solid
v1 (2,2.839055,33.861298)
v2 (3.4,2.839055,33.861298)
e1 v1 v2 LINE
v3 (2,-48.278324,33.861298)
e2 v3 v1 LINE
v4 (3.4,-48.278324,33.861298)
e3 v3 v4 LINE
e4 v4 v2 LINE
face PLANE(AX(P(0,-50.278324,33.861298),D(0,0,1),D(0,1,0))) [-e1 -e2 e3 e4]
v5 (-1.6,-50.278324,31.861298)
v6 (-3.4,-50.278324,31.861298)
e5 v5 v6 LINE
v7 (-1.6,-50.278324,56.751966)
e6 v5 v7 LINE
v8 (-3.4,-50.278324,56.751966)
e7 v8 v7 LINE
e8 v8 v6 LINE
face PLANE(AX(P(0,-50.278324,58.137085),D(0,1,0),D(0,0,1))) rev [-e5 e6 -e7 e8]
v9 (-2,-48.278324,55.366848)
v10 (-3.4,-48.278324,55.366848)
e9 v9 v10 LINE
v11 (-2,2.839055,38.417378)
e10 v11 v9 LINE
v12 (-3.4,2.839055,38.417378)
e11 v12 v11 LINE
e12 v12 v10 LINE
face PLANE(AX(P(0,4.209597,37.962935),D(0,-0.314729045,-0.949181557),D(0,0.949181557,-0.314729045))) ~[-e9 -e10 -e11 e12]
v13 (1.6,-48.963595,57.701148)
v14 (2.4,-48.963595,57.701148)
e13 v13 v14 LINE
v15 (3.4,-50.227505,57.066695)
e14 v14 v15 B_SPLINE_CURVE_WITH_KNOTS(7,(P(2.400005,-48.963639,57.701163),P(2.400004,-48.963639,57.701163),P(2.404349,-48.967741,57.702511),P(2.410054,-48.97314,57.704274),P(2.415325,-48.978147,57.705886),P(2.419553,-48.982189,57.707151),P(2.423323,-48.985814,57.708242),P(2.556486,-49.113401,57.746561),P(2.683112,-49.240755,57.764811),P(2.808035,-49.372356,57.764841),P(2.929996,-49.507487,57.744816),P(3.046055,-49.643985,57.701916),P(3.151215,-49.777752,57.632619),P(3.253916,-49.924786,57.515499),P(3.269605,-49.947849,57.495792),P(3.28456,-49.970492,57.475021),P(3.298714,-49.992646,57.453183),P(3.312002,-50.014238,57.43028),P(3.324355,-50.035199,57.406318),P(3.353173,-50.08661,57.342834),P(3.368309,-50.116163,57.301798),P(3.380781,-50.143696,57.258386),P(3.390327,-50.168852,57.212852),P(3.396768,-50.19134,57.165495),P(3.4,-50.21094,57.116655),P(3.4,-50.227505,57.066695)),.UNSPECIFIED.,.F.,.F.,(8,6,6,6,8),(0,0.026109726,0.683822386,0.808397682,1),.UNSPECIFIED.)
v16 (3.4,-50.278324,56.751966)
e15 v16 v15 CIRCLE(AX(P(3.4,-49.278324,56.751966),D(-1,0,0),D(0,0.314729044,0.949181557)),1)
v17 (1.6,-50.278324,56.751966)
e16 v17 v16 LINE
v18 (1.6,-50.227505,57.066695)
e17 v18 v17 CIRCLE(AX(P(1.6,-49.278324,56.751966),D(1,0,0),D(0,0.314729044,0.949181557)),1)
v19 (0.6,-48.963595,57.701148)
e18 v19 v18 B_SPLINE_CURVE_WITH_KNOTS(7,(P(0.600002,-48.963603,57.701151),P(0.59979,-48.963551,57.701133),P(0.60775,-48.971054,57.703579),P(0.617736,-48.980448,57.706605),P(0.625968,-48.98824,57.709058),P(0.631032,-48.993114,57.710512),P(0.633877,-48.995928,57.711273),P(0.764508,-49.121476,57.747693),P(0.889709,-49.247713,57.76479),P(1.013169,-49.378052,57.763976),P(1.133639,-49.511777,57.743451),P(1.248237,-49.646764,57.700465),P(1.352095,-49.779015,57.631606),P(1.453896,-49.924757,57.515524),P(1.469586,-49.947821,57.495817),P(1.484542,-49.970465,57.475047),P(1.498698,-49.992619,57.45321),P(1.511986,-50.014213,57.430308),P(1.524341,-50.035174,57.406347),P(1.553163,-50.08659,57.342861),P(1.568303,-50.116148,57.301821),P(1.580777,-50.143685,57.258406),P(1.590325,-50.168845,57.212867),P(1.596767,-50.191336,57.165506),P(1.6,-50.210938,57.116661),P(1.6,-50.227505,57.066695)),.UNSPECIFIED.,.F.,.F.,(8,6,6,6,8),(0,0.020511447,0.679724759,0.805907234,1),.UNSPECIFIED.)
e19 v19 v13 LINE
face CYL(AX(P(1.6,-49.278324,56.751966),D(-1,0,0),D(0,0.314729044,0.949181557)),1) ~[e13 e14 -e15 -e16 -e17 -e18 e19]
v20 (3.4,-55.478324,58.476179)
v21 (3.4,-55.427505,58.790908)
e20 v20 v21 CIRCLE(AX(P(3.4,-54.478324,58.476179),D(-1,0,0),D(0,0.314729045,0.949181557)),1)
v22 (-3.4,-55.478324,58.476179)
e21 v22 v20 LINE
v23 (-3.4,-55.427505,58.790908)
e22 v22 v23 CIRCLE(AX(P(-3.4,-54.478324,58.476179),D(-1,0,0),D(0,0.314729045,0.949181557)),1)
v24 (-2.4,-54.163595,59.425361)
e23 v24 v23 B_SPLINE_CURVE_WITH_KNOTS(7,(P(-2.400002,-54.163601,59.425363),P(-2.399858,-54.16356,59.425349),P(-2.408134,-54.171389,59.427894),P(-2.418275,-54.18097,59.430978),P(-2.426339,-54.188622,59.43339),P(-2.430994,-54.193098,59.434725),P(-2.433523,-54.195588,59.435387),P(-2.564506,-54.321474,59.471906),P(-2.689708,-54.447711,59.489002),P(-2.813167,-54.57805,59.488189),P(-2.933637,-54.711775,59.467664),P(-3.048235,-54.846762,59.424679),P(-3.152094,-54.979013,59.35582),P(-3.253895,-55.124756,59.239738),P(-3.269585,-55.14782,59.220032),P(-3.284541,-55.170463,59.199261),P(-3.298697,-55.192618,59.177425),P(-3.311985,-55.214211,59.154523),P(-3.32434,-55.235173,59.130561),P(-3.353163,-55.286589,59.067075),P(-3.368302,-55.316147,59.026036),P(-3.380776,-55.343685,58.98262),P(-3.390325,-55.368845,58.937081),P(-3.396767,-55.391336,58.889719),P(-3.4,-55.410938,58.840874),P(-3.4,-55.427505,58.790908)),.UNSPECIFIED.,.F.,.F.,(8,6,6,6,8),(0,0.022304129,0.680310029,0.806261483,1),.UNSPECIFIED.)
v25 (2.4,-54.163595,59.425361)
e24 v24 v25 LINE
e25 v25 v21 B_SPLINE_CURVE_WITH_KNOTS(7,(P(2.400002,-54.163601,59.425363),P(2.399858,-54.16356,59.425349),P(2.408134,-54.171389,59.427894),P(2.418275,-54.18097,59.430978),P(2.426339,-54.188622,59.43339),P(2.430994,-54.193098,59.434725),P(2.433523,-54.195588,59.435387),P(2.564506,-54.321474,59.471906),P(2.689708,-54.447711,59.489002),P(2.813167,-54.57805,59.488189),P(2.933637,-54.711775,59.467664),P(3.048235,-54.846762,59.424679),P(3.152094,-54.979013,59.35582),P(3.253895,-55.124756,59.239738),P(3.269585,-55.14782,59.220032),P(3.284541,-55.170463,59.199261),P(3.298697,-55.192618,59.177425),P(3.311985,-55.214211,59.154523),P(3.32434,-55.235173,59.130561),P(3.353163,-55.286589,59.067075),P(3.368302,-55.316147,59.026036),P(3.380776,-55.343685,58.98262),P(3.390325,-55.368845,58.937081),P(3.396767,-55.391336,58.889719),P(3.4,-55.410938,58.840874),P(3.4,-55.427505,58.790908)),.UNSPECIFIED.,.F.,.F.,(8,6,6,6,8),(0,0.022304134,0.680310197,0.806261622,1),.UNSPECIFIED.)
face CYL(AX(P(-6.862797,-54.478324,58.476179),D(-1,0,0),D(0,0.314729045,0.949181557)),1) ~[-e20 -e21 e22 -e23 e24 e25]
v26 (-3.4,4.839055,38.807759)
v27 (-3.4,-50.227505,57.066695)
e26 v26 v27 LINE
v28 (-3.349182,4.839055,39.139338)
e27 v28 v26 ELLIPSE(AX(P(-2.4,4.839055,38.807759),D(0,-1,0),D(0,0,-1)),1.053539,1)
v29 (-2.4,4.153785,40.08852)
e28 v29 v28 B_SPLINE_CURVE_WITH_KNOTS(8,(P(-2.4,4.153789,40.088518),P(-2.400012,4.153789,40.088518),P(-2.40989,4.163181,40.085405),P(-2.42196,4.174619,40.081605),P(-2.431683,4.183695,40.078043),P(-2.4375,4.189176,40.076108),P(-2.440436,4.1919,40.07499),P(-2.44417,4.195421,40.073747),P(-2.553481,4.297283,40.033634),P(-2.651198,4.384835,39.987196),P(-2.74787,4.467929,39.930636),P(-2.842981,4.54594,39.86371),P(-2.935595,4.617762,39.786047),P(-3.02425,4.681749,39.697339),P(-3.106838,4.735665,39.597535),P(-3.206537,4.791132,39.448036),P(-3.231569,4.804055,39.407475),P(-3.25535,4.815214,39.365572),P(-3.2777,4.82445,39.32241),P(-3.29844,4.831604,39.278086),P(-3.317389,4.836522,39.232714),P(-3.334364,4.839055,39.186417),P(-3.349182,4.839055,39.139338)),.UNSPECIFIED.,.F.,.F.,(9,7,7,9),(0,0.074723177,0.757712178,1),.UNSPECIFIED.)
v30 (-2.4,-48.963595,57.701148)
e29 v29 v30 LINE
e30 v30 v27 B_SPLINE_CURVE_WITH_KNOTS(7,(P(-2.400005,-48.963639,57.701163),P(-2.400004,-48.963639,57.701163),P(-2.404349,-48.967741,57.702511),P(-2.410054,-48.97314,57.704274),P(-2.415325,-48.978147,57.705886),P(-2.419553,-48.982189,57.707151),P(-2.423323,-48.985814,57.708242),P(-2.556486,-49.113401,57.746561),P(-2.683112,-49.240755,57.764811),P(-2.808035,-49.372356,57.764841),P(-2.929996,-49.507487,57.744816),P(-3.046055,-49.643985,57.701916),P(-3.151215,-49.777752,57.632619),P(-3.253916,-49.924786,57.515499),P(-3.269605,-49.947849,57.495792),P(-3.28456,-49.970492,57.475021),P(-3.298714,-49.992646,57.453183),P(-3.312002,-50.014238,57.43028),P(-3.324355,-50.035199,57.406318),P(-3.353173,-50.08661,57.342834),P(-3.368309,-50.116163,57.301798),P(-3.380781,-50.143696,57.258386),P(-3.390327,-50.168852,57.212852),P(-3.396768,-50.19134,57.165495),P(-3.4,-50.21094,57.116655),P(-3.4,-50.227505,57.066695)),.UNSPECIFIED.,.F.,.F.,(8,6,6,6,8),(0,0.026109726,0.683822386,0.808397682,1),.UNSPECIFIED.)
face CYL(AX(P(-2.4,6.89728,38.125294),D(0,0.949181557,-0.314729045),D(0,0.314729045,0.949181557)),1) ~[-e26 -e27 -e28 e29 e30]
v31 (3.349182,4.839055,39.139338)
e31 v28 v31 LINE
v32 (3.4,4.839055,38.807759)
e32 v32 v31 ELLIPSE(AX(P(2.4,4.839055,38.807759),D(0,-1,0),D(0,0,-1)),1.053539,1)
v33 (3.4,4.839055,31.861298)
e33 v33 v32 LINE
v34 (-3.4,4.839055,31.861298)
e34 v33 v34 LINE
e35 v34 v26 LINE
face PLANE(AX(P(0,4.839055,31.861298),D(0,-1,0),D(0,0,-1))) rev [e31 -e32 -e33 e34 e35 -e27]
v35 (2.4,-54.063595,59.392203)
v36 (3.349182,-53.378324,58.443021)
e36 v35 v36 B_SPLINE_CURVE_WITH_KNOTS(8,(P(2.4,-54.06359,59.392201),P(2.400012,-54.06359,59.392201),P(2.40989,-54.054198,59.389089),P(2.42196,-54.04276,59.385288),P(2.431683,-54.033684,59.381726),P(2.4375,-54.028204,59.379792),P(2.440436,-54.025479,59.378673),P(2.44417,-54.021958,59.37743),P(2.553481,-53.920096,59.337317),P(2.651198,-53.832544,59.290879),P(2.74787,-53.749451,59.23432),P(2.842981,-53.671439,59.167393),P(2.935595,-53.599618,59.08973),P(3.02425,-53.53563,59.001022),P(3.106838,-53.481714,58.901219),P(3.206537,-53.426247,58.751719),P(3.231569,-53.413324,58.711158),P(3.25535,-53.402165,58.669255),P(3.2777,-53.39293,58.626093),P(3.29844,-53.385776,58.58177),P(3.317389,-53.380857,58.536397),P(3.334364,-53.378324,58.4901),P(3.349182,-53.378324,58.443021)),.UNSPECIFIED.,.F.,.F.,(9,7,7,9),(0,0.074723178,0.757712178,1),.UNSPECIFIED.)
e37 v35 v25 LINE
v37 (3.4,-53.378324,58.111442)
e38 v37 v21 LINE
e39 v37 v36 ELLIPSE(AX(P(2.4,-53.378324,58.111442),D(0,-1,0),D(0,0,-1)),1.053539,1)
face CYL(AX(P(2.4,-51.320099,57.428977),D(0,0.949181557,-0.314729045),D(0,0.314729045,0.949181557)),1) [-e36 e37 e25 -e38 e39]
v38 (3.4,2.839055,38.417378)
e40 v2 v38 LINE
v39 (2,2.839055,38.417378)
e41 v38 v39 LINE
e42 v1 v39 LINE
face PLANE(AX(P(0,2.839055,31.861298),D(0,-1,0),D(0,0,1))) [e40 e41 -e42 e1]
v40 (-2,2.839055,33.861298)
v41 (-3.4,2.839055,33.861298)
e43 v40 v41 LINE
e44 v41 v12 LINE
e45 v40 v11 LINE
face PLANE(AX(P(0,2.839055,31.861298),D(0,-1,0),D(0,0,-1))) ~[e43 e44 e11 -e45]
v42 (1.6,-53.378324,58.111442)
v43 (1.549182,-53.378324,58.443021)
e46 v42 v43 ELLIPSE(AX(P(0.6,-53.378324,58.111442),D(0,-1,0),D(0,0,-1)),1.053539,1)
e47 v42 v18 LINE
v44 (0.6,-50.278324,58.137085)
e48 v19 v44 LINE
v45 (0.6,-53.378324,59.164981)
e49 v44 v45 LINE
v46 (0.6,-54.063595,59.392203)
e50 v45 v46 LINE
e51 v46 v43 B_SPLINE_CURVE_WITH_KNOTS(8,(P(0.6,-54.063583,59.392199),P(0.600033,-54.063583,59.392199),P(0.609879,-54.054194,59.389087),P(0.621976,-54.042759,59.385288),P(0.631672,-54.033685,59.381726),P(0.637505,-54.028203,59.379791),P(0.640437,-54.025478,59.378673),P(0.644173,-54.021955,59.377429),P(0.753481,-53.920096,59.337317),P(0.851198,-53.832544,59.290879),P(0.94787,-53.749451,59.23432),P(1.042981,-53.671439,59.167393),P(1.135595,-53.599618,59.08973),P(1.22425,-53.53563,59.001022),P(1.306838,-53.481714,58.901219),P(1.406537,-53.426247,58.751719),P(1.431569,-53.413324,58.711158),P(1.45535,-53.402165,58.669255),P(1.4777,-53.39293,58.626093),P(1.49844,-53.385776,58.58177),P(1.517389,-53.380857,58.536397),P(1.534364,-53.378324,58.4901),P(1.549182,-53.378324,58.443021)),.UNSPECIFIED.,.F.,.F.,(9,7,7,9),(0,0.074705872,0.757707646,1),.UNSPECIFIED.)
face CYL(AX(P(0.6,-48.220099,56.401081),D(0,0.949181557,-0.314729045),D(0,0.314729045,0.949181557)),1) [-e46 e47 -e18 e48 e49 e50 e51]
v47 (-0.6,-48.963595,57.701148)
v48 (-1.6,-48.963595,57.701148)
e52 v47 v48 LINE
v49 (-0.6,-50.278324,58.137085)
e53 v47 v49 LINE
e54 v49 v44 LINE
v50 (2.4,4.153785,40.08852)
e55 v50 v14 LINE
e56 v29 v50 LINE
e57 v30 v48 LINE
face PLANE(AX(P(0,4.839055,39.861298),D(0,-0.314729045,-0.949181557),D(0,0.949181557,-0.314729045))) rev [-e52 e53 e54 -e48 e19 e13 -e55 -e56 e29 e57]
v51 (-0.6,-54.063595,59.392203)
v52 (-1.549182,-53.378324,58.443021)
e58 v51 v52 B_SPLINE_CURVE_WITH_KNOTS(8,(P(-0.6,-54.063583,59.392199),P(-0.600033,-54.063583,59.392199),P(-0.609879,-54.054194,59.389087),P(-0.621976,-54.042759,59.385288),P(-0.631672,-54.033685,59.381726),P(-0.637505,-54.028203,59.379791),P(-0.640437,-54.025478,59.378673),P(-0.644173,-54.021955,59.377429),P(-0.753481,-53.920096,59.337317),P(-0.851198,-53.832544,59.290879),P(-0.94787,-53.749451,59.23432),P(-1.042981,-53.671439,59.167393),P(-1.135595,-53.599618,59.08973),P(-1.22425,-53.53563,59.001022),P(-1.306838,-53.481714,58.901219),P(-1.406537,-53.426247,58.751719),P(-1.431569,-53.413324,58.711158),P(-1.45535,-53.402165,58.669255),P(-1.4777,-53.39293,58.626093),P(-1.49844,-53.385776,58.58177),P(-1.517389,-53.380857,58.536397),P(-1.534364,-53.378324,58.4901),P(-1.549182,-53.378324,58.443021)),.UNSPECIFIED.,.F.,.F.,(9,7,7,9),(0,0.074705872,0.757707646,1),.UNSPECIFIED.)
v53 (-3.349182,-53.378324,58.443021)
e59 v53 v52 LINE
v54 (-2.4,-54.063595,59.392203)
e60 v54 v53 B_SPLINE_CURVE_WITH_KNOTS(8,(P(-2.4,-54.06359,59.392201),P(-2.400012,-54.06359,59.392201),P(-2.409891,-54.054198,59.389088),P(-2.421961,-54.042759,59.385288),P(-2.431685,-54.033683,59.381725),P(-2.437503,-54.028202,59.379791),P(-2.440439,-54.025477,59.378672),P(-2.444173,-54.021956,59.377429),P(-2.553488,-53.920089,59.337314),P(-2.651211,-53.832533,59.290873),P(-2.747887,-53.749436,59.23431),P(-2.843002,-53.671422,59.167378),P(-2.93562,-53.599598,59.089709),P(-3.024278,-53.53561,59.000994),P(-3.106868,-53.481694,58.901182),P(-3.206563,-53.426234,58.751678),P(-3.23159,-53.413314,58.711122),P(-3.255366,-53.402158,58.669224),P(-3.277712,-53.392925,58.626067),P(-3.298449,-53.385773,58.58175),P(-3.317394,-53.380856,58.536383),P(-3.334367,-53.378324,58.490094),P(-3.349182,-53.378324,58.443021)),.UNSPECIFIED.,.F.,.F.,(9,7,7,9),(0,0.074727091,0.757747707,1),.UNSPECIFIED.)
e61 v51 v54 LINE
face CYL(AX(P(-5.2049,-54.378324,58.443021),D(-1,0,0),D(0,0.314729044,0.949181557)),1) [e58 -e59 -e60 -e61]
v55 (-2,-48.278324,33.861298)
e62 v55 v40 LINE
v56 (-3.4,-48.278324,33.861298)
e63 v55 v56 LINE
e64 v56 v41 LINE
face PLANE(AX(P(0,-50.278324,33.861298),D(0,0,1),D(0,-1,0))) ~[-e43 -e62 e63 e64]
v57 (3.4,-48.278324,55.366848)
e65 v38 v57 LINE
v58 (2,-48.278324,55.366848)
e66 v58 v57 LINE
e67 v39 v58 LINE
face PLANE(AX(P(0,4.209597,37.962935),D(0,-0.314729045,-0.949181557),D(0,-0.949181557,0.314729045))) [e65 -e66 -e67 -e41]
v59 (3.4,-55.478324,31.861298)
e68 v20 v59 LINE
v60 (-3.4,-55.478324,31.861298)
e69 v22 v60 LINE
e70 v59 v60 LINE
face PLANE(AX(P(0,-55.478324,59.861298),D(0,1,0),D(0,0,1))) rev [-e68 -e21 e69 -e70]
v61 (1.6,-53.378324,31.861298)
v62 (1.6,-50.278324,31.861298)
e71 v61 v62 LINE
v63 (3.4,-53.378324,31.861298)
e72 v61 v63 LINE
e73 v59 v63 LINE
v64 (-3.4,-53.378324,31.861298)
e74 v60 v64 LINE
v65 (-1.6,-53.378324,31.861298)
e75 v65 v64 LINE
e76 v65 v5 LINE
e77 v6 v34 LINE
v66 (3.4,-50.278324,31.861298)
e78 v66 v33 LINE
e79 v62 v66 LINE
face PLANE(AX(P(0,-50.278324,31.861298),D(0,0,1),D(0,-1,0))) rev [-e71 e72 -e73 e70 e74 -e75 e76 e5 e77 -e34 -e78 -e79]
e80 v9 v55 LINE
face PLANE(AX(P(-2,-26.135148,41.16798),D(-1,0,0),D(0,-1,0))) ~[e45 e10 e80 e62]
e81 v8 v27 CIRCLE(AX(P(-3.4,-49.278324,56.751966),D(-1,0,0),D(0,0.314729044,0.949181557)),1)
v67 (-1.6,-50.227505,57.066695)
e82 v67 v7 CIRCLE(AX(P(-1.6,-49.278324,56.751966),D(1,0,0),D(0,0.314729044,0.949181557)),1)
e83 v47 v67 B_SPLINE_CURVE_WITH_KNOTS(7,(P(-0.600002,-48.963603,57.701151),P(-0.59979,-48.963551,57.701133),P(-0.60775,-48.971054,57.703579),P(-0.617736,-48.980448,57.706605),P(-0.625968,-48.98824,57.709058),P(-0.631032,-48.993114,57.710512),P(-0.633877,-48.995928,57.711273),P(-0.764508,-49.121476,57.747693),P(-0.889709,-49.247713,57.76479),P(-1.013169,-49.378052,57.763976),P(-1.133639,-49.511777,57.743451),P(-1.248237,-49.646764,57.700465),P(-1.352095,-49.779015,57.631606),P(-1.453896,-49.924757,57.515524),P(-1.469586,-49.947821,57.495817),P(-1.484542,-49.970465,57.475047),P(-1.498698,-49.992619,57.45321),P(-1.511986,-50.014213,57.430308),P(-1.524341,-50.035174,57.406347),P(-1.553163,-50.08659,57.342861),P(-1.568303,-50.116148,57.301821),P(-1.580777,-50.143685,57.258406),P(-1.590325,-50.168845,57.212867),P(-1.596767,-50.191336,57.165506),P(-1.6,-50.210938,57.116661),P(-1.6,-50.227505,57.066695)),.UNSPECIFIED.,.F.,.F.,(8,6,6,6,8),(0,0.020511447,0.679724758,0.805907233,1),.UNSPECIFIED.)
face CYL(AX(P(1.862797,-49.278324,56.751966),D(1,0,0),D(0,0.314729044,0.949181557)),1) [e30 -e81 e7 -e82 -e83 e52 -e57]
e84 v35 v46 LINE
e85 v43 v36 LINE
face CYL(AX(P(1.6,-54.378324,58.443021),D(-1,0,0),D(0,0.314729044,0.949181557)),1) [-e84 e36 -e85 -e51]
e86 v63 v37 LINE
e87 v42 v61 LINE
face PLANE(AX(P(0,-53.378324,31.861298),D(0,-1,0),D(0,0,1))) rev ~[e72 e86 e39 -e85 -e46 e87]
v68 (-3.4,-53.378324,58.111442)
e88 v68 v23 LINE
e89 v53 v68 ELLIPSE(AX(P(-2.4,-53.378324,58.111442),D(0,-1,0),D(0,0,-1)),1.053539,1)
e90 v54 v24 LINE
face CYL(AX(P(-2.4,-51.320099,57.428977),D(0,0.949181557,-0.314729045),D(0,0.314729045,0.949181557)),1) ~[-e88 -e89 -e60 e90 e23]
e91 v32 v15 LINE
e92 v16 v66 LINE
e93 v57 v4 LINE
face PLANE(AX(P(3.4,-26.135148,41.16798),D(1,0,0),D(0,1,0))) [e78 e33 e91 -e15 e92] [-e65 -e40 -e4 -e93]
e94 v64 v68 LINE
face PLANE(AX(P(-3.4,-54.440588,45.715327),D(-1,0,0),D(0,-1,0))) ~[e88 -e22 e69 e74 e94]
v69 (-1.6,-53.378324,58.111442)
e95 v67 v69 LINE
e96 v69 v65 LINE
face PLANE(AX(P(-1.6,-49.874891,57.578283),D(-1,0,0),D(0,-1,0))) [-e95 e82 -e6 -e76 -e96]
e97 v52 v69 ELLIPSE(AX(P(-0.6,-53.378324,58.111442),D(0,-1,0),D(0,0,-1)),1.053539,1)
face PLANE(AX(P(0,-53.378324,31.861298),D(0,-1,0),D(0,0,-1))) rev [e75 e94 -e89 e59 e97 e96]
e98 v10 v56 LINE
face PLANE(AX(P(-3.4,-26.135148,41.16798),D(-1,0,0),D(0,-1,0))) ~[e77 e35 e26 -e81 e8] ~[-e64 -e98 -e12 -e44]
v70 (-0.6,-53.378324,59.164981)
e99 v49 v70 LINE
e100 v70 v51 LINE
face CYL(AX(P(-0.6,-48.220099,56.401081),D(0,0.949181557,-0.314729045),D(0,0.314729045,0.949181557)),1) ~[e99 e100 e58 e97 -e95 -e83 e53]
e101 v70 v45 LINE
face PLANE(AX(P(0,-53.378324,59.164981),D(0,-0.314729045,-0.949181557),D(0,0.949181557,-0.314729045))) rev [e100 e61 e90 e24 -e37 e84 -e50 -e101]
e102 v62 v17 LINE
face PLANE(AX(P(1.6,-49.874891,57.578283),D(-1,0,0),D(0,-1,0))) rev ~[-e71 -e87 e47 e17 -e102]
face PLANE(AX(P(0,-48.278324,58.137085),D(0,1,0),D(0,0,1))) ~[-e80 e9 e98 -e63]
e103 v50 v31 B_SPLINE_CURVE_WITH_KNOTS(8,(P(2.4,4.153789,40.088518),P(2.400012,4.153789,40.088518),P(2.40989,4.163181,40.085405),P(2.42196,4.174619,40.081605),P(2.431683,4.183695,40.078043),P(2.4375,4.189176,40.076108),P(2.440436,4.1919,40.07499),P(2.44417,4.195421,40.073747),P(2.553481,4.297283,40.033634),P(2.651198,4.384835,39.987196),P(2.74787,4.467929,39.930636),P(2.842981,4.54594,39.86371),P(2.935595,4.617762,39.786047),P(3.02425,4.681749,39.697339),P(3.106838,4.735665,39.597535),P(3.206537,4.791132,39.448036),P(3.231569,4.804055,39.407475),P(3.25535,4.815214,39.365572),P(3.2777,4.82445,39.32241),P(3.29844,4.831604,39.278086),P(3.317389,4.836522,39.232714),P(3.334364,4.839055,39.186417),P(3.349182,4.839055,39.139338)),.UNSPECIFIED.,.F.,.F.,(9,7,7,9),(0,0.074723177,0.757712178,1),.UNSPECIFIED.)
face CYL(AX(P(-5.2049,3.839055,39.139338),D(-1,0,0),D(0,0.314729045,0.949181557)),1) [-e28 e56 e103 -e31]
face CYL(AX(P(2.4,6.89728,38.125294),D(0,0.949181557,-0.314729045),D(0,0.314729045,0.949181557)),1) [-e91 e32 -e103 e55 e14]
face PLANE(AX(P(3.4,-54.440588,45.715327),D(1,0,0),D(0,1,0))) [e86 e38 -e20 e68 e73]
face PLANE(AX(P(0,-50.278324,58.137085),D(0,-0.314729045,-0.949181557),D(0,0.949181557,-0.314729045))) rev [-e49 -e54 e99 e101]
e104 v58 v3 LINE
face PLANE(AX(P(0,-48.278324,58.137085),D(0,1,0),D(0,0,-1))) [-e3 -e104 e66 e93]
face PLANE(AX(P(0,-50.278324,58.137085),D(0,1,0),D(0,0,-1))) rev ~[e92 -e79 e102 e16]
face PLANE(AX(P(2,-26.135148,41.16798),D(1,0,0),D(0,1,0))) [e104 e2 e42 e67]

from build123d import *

# Parameters (mm, degrees)
F1_DEPTH     = 1.6
F2_DEPTH     = 3.4
F3_T         = -2
F5_T1_DEPTH  = 10.409799149
F5_T3_DEPTH  = 63.0683209094
F5_T5_DEPTH  = 5.2627965391
F5_T7_DEPTH  = 3.6048995745
F5_T9_DEPTH  = 7.2124323677
F5_T11_DEPTH = 13.7255930783
F5_T13_DEPTH = 3.6048995745
F5_T15_DEPTH = 5.2627965391
F5_T20_DEPTH = 8.7255930783
F5_T25_DEPTH = 8.2659715904
F5_T31_DEPTH = 8.2659715904
F5_T37_DEPTH = 8.7255930783
F5_T43_DEPTH = 8.7255930783
F5_T48_DEPTH = 8.2659715904
F5_T55_DEPTH = 8.2659715904
F5_T59_DEPTH = 5.409799149
F5_T66_DEPTH = 5.409799149
F5_T70_DEPTH = 8.2659715904
F5_T77_DEPTH = 8.2659715904
F5_T81_DEPTH = 8.7255930783


# Not quite as in the source:
# - a fillet or chamfer that OpenCascade refuses, or shapes differently, is made with other operations: its cross-section is extruded or revolved along the edge and cut away or added


with BuildPart() as f1:
    # F0 (on Right) → F1 (new body)
    with BuildSketch(Plane.YZ):
        Polygon((-50.2783237807, 58.1370850594), (-53.3783237807, 59.1649811775), (-53.3783237807, 31.8612979027), (-50.2783237807, 31.8612979027), align=None)
    extrude(amount=F1_DEPTH)

    # F0 (on Right) → F2 (join)
    with BuildSketch(Plane.YZ):
        Polygon((4.8390554843, 39.8612979027), (-50.2783237807, 58.1370850594), (-50.2783237807, 31.8612979027), (4.8390554843, 31.8612979027), align=None)
        Polygon((-53.3783237807, 59.1649811775), (-55.4783237807, 59.8612979027), (-55.4783237807, 31.8612979027), (-53.3783237807, 31.8612979027), align=None)
    extrude(amount=F2_DEPTH)

    # F3
    f3_openings = [f1.faces().sort_by_distance(p)[0] for p in [
        (3.4, -27.617715, 41.242296),
    ]]
    offset(amount=F3_T, openings=f3_openings)

    # F4: F1 across face


with BuildPart() as f1_1:
    add(f1.part)
    add(f1.part.mirror(Plane.YZ))

    # F5: fillet of radius 1 on 12 edges, made by hand

    # F5_s2 → F5_t1 (cut)
    with BuildSketch(Plane.YZ.offset(-5.2048995745)):
        with BuildLine():
            ThreePointArc((4.1537845288, 40.0885196301), (4.6498356778, 39.7246888034), (4.8390554843, 39.1393380729))
            Line((4.8390554843, 39.1393380729), (4.8390554843, 39.8612979027))
            Line((4.8390554843, 39.8612979027), (4.1537845288, 40.0885196301))
        make_face()
    extrude(amount=F5_T1_DEPTH, mode=Mode.SUBTRACT)

    # F5_s4 → F5_t3 (cut)
    with BuildSketch(Plane(origin=(0, -5.1752852335, 1.716017936), x_dir=(1, 0, 0), z_dir=(0, -0.9491815572, 0.3147290445))):
        with BuildLine():
            ThreePointArc((2.4, 39.3586001244), (3.1071067812, 39.0657069056), (3.4, 38.3586001244))
            Line((3.4, 38.3586001244), (3.4, 39.3586001244))
            Line((3.4, 39.3586001244), (2.4, 39.3586001244))
        make_face()
        with BuildLine():
            ThreePointArc((-2.4, 39.3586001244), (-3.1071067812, 39.0657069056), (-3.4, 38.3586001244))
            Line((-3.4, 38.3586001244), (-3.4, 39.3586001244))
            Line((-3.4, 39.3586001244), (-2.4, 39.3586001244))
        make_face()
    extrude(amount=F5_T3_DEPTH, mode=Mode.SUBTRACT)

    # F5_s6 → F5_t5 (cut)
    with BuildSketch(Plane.YZ.offset(1.6)):
        with BuildLine():
            ThreePointArc((-48.9635947362, 57.701148001), (-49.8636745112, 57.5627466373), (-50.2783237807, 56.7519664438))
            Line((-50.2783237807, 56.7519664438), (-50.2783237807, 58.1370850594))
            Line((-50.2783237807, 58.1370850594), (-48.9635947362, 57.701148001))
        make_face()
    extrude(amount=F5_T5_DEPTH, mode=Mode.SUBTRACT)

    # F5_s8 → F5_t7 (cut)
    with BuildSketch(Plane.YZ.offset(1.6)):
        with BuildLine():
            ThreePointArc((-54.0635947362, 59.3922029049), (-53.5675435871, 59.0283720783), (-53.3783237807, 58.4430213477))
            Line((-53.3783237807, 58.4430213477), (-53.3783237807, 59.1649811775))
            Line((-53.3783237807, 59.1649811775), (-54.0635947362, 59.3922029049))
        make_face()
    extrude(amount=F5_T7_DEPTH, mode=Mode.SUBTRACT)

    # F5_s10 → F5_t9 (cut)
    with BuildSketch(Plane(origin=(0, -63.3926644985, 21.0197012108), x_dir=(1, 0, 0), z_dir=(0, -0.9491815572, 0.3147290445))):
        with BuildLine():
            ThreePointArc((2.4, 39.3586001244), (3.1071067812, 39.0657069056), (3.4, 38.3586001244))
            Line((3.4, 38.3586001244), (3.4, 39.3586001244))
            Line((3.4, 39.3586001244), (2.4, 39.3586001244))
        make_face()
        with BuildLine():
            ThreePointArc((-2.4, 39.3586001244), (-3.1071067812, 39.0657069056), (-3.4, 38.3586001244))
            Line((-3.4, 38.3586001244), (-3.4, 39.3586001244))
            Line((-3.4, 39.3586001244), (-2.4, 39.3586001244))
        make_face()
    extrude(amount=F5_T9_DEPTH, mode=Mode.SUBTRACT)

    # F5_s12 → F5_t11 (cut)
    with BuildSketch(Plane.YZ.offset(-6.8627965391)):
        with BuildLine():
            ThreePointArc((-54.1635947362, 59.4253608442), (-55.0636745112, 59.2869594806), (-55.4783237807, 58.476179287))
            Line((-55.4783237807, 58.476179287), (-55.4783237807, 59.8612979027))
            Line((-55.4783237807, 59.8612979027), (-54.1635947362, 59.4253608442))
        make_face()
    extrude(amount=F5_T11_DEPTH, mode=Mode.SUBTRACT)

    # F5_s14 → F5_t13 (cut)
    with BuildSketch(Plane.YZ.offset(-5.2048995745)):
        with BuildLine():
            ThreePointArc((-54.0635947362, 59.3922029049), (-53.5675435871, 59.0283720783), (-53.3783237807, 58.4430213477))
            Line((-53.3783237807, 58.4430213477), (-53.3783237807, 59.1649811775))
            Line((-53.3783237807, 59.1649811775), (-54.0635947362, 59.3922029049))
        make_face()
    extrude(amount=F5_T13_DEPTH, mode=Mode.SUBTRACT)

    # F5_s16 → F5_t15 (cut)
    with BuildSketch(Plane.YZ.offset(-6.8627965391)):
        with BuildLine():
            ThreePointArc((-48.9635947362, 57.701148001), (-49.8636745112, 57.5627466373), (-50.2783237807, 56.7519664438))
            Line((-50.2783237807, 56.7519664438), (-50.2783237807, 58.1370850594))
            Line((-50.2783237807, 58.1370850594), (-48.9635947362, 57.701148001))
        make_face()
    extrude(amount=F5_T15_DEPTH, mode=Mode.SUBTRACT)


with BuildPart() as f5_tool18:
    # F5_s19 → F5_t20 (new body)
    with BuildSketch(Plane.YZ.offset(-1.8627965391)):
        with BuildLine():
            ThreePointArc((-48.9635947362, 57.701148001), (-49.8636745112, 57.5627466373), (-50.2783237807, 56.7519664438))
            Line((-50.2783237807, 56.7519664438), (-50.2783237807, 58.1370850594))
            Line((-50.2783237807, 58.1370850594), (-48.9635947362, 57.701148001))
        make_face()
    extrude(amount=F5_T20_DEPTH)

    split(bisect_by=Plane.YZ.offset(-1.6), keep=Keep.BOTTOM)


with BuildPart() as f1_2:
    add(f1_1.part)

    # F5_t17: cut F5_tool18
    add(f5_tool18.part, mode=Mode.SUBTRACT)


with BuildPart() as f5_tool23:
    # F5_s24 → F5_t25 (new body)
    with BuildSketch(Plane(origin=(0, -60.2926644985, 19.9918050927), x_dir=(1, 0, 0), z_dir=(0, -0.9491815572, 0.3147290445))):
        with BuildLine():
            ThreePointArc((0.6, 39.3586001244), (1.3071067812, 39.0657069056), (1.6, 38.3586001244))
            Line((1.6, 38.3586001244), (1.6, 39.3586001244))
            Line((1.6, 39.3586001244), (0.6, 39.3586001244))
        make_face()
    extrude(amount=F5_T25_DEPTH)

    split(bisect_by=Plane.XZ.offset(53.3783237807), keep=Keep.BOTTOM)

    split(bisect_by=Plane.XZ.offset(50.2783237807), keep=Keep.TOP)


with BuildPart() as f1_3:
    add(f1_2.part)

    # F5_t22: cut F5_tool23
    add(f5_tool23.part, mode=Mode.SUBTRACT)


with BuildPart() as f5_tool29:
    # F5_s30 → F5_t31 (new body)
    with BuildSketch(Plane(origin=(0, -60.2926644985, 19.9918050927), x_dir=(1, 0, 0), z_dir=(0, -0.9491815572, 0.3147290445))):
        with BuildLine():
            ThreePointArc((-0.6, 39.3586001244), (-1.3071067812, 39.0657069056), (-1.6, 38.3586001244))
            Line((-1.6, 38.3586001244), (-1.6, 39.3586001244))
            Line((-1.6, 39.3586001244), (-0.6, 39.3586001244))
        make_face()
    extrude(amount=F5_T31_DEPTH)

    split(bisect_by=Plane.XZ.offset(50.2783237807), keep=Keep.TOP)

    split(bisect_by=Plane.XZ.offset(53.3783237807), keep=Keep.BOTTOM)


with BuildPart() as f1_4:
    add(f1_3.part)

    # F5_t28: cut F5_tool29
    add(f5_tool29.part, mode=Mode.SUBTRACT)


with BuildPart() as f5_tool35:
    # F5_s36 → F5_t37 (new body)
    with BuildSketch(Plane.YZ.offset(1.8627965391)):
        with BuildLine():
            ThreePointArc((-48.9635947362, 57.701148001), (-49.8636745112, 57.5627466373), (-50.2783237807, 56.7519664438))
            Line((-50.2783237807, 56.7519664438), (-50.2783237807, 58.1370850594))
            Line((-50.2783237807, 58.1370850594), (-48.9635947362, 57.701148001))
        make_face()
    extrude(amount=-F5_T37_DEPTH)

    split(bisect_by=Plane.YZ.offset(1.6), keep=Keep.TOP)


with BuildPart() as f1_5:
    add(f1_4.part)

    # F5_t34: cut F5_tool35
    add(f5_tool35.part, mode=Mode.SUBTRACT)


with BuildPart() as f5_tool41:
    # F5_s42 → F5_t43 (new body)
    with BuildSketch(Plane.YZ.offset(-1.8627965391)):
        with BuildLine():
            ThreePointArc((-48.9635947362, 57.701148001), (-49.8636745112, 57.5627466373), (-50.2783237807, 56.7519664438))
            Line((-50.2783237807, 56.7519664438), (-50.2783237807, 58.1370850594))
            Line((-50.2783237807, 58.1370850594), (-48.9635947362, 57.701148001))
        make_face()
    extrude(amount=F5_T43_DEPTH)

    split(bisect_by=Plane.YZ.offset(-1.6), keep=Keep.TOP)

    split(bisect_by=Plane.YZ.offset(1.6), keep=Keep.BOTTOM)


with BuildPart() as f5_tool46:
    # F5_s47 → F5_t48 (new body)
    with BuildSketch(Plane(origin=(0, -60.2926644985, 19.9918050927), x_dir=(1, 0, 0), z_dir=(0, -0.9491815572, 0.3147290445))):
        with BuildLine():
            ThreePointArc((0.6, 39.3586001244), (1.3071067812, 39.0657069056), (1.6, 38.3586001244))
            Line((1.6, 38.3586001244), (1.6, 39.3586001244))
            Line((1.6, 39.3586001244), (0.6, 39.3586001244))
        make_face()
    extrude(amount=F5_T48_DEPTH)

    split(bisect_by=Plane.XZ.offset(50.2783237807), keep=Keep.BOTTOM)


with BuildPart() as f5_tool41_1:
    add(f5_tool41.part)

    # F5_t50: intersect F5_tool46
    add(f5_tool46.part, mode=Mode.INTERSECT)


with BuildPart() as f1_6:
    add(f1_5.part)

    # F5_t39: cut F5_tool41
    add(f5_tool41_1.part, mode=Mode.SUBTRACT)


with BuildPart() as f5_tool53:
    # F5_s54 → F5_t55 (new body)
    with BuildSketch(Plane(origin=(0, -60.2926644985, 19.9918050927), x_dir=(1, 0, 0), z_dir=(0, -0.9491815572, 0.3147290445))):
        with BuildLine():
            ThreePointArc((0.6, 39.3586001244), (1.3071067812, 39.0657069056), (1.6, 38.3586001244))
            Line((1.6, 38.3586001244), (1.6, 39.3586001244))
            Line((1.6, 39.3586001244), (0.6, 39.3586001244))
        make_face()
    extrude(amount=F5_T55_DEPTH)

    split(bisect_by=Plane.XZ.offset(53.3783237807), keep=Keep.TOP)


with BuildPart() as f5_tool57:
    # F5_s58 → F5_t59 (new body)
    with BuildSketch(Plane.YZ.offset(-0.2048995745)):
        with BuildLine():
            ThreePointArc((-54.0635947362, 59.3922029049), (-53.5675435871, 59.0283720783), (-53.3783237807, 58.4430213477))
            Line((-53.3783237807, 58.4430213477), (-53.3783237807, 59.1649811775))
            Line((-53.3783237807, 59.1649811775), (-54.0635947362, 59.3922029049))
        make_face()
    extrude(amount=F5_T59_DEPTH)

    split(bisect_by=Plane.YZ.offset(1.6), keep=Keep.BOTTOM)


with BuildPart() as f5_tool53_1:
    add(f5_tool53.part)

    # F5_t61: intersect F5_tool57
    add(f5_tool57.part, mode=Mode.INTERSECT)


with BuildPart() as f1_7:
    add(f1_6.part)

    # F5_t51: cut F5_tool53
    add(f5_tool53_1.part, mode=Mode.SUBTRACT)


with BuildPart() as f5_tool64:
    # F5_s65 → F5_t66 (new body)
    with BuildSketch(Plane.YZ.offset(0.2048995745)):
        with BuildLine():
            ThreePointArc((-54.0635947362, 59.3922029049), (-53.5675435871, 59.0283720783), (-53.3783237807, 58.4430213477))
            Line((-53.3783237807, 58.4430213477), (-53.3783237807, 59.1649811775))
            Line((-53.3783237807, 59.1649811775), (-54.0635947362, 59.3922029049))
        make_face()
    extrude(amount=-F5_T66_DEPTH)

    split(bisect_by=Plane.YZ.offset(-1.6), keep=Keep.TOP)


with BuildPart() as f5_tool68:
    # F5_s69 → F5_t70 (new body)
    with BuildSketch(Plane(origin=(0, -60.2926644985, 19.9918050927), x_dir=(1, 0, 0), z_dir=(0, -0.9491815572, 0.3147290445))):
        with BuildLine():
            ThreePointArc((-0.6, 39.3586001244), (-1.3071067812, 39.0657069056), (-1.6, 38.3586001244))
            Line((-1.6, 38.3586001244), (-1.6, 39.3586001244))
            Line((-1.6, 39.3586001244), (-0.6, 39.3586001244))
        make_face()
    extrude(amount=F5_T70_DEPTH)

    split(bisect_by=Plane.XZ.offset(53.3783237807), keep=Keep.TOP)


with BuildPart() as f5_tool64_1:
    add(f5_tool64.part)

    # F5_t72: intersect F5_tool68
    add(f5_tool68.part, mode=Mode.INTERSECT)


with BuildPart() as f1_8:
    add(f1_7.part)

    # F5_t62: cut F5_tool64
    add(f5_tool64_1.part, mode=Mode.SUBTRACT)


with BuildPart() as f5_tool75:
    # F5_s76 → F5_t77 (new body)
    with BuildSketch(Plane(origin=(0, -60.2926644985, 19.9918050927), x_dir=(1, 0, 0), z_dir=(0, -0.9491815572, 0.3147290445))):
        with BuildLine():
            ThreePointArc((-0.6, 39.3586001244), (-1.3071067812, 39.0657069056), (-1.6, 38.3586001244))
            Line((-1.6, 38.3586001244), (-1.6, 39.3586001244))
            Line((-1.6, 39.3586001244), (-0.6, 39.3586001244))
        make_face()
    extrude(amount=F5_T77_DEPTH)

    split(bisect_by=Plane.XZ.offset(50.2783237807), keep=Keep.BOTTOM)


with BuildPart() as f5_tool79:
    # F5_s80 → F5_t81 (new body)
    with BuildSketch(Plane.YZ.offset(1.8627965391)):
        with BuildLine():
            ThreePointArc((-48.9635947362, 57.701148001), (-49.8636745112, 57.5627466373), (-50.2783237807, 56.7519664438))
            Line((-50.2783237807, 56.7519664438), (-50.2783237807, 58.1370850594))
            Line((-50.2783237807, 58.1370850594), (-48.9635947362, 57.701148001))
        make_face()
    extrude(amount=-F5_T81_DEPTH)

    split(bisect_by=Plane.YZ.offset(-1.6), keep=Keep.TOP)

    split(bisect_by=Plane.YZ.offset(1.6), keep=Keep.BOTTOM)


with BuildPart() as f5_tool75_1:
    add(f5_tool75.part)

    # F5_t84: intersect F5_tool79
    add(f5_tool79.part, mode=Mode.INTERSECT)


with BuildPart() as f1_9:
    add(f1_8.part)

    # F5_t73: cut F5_tool75
    add(f5_tool75_1.part, mode=Mode.SUBTRACT)


solid = f1_9.part
